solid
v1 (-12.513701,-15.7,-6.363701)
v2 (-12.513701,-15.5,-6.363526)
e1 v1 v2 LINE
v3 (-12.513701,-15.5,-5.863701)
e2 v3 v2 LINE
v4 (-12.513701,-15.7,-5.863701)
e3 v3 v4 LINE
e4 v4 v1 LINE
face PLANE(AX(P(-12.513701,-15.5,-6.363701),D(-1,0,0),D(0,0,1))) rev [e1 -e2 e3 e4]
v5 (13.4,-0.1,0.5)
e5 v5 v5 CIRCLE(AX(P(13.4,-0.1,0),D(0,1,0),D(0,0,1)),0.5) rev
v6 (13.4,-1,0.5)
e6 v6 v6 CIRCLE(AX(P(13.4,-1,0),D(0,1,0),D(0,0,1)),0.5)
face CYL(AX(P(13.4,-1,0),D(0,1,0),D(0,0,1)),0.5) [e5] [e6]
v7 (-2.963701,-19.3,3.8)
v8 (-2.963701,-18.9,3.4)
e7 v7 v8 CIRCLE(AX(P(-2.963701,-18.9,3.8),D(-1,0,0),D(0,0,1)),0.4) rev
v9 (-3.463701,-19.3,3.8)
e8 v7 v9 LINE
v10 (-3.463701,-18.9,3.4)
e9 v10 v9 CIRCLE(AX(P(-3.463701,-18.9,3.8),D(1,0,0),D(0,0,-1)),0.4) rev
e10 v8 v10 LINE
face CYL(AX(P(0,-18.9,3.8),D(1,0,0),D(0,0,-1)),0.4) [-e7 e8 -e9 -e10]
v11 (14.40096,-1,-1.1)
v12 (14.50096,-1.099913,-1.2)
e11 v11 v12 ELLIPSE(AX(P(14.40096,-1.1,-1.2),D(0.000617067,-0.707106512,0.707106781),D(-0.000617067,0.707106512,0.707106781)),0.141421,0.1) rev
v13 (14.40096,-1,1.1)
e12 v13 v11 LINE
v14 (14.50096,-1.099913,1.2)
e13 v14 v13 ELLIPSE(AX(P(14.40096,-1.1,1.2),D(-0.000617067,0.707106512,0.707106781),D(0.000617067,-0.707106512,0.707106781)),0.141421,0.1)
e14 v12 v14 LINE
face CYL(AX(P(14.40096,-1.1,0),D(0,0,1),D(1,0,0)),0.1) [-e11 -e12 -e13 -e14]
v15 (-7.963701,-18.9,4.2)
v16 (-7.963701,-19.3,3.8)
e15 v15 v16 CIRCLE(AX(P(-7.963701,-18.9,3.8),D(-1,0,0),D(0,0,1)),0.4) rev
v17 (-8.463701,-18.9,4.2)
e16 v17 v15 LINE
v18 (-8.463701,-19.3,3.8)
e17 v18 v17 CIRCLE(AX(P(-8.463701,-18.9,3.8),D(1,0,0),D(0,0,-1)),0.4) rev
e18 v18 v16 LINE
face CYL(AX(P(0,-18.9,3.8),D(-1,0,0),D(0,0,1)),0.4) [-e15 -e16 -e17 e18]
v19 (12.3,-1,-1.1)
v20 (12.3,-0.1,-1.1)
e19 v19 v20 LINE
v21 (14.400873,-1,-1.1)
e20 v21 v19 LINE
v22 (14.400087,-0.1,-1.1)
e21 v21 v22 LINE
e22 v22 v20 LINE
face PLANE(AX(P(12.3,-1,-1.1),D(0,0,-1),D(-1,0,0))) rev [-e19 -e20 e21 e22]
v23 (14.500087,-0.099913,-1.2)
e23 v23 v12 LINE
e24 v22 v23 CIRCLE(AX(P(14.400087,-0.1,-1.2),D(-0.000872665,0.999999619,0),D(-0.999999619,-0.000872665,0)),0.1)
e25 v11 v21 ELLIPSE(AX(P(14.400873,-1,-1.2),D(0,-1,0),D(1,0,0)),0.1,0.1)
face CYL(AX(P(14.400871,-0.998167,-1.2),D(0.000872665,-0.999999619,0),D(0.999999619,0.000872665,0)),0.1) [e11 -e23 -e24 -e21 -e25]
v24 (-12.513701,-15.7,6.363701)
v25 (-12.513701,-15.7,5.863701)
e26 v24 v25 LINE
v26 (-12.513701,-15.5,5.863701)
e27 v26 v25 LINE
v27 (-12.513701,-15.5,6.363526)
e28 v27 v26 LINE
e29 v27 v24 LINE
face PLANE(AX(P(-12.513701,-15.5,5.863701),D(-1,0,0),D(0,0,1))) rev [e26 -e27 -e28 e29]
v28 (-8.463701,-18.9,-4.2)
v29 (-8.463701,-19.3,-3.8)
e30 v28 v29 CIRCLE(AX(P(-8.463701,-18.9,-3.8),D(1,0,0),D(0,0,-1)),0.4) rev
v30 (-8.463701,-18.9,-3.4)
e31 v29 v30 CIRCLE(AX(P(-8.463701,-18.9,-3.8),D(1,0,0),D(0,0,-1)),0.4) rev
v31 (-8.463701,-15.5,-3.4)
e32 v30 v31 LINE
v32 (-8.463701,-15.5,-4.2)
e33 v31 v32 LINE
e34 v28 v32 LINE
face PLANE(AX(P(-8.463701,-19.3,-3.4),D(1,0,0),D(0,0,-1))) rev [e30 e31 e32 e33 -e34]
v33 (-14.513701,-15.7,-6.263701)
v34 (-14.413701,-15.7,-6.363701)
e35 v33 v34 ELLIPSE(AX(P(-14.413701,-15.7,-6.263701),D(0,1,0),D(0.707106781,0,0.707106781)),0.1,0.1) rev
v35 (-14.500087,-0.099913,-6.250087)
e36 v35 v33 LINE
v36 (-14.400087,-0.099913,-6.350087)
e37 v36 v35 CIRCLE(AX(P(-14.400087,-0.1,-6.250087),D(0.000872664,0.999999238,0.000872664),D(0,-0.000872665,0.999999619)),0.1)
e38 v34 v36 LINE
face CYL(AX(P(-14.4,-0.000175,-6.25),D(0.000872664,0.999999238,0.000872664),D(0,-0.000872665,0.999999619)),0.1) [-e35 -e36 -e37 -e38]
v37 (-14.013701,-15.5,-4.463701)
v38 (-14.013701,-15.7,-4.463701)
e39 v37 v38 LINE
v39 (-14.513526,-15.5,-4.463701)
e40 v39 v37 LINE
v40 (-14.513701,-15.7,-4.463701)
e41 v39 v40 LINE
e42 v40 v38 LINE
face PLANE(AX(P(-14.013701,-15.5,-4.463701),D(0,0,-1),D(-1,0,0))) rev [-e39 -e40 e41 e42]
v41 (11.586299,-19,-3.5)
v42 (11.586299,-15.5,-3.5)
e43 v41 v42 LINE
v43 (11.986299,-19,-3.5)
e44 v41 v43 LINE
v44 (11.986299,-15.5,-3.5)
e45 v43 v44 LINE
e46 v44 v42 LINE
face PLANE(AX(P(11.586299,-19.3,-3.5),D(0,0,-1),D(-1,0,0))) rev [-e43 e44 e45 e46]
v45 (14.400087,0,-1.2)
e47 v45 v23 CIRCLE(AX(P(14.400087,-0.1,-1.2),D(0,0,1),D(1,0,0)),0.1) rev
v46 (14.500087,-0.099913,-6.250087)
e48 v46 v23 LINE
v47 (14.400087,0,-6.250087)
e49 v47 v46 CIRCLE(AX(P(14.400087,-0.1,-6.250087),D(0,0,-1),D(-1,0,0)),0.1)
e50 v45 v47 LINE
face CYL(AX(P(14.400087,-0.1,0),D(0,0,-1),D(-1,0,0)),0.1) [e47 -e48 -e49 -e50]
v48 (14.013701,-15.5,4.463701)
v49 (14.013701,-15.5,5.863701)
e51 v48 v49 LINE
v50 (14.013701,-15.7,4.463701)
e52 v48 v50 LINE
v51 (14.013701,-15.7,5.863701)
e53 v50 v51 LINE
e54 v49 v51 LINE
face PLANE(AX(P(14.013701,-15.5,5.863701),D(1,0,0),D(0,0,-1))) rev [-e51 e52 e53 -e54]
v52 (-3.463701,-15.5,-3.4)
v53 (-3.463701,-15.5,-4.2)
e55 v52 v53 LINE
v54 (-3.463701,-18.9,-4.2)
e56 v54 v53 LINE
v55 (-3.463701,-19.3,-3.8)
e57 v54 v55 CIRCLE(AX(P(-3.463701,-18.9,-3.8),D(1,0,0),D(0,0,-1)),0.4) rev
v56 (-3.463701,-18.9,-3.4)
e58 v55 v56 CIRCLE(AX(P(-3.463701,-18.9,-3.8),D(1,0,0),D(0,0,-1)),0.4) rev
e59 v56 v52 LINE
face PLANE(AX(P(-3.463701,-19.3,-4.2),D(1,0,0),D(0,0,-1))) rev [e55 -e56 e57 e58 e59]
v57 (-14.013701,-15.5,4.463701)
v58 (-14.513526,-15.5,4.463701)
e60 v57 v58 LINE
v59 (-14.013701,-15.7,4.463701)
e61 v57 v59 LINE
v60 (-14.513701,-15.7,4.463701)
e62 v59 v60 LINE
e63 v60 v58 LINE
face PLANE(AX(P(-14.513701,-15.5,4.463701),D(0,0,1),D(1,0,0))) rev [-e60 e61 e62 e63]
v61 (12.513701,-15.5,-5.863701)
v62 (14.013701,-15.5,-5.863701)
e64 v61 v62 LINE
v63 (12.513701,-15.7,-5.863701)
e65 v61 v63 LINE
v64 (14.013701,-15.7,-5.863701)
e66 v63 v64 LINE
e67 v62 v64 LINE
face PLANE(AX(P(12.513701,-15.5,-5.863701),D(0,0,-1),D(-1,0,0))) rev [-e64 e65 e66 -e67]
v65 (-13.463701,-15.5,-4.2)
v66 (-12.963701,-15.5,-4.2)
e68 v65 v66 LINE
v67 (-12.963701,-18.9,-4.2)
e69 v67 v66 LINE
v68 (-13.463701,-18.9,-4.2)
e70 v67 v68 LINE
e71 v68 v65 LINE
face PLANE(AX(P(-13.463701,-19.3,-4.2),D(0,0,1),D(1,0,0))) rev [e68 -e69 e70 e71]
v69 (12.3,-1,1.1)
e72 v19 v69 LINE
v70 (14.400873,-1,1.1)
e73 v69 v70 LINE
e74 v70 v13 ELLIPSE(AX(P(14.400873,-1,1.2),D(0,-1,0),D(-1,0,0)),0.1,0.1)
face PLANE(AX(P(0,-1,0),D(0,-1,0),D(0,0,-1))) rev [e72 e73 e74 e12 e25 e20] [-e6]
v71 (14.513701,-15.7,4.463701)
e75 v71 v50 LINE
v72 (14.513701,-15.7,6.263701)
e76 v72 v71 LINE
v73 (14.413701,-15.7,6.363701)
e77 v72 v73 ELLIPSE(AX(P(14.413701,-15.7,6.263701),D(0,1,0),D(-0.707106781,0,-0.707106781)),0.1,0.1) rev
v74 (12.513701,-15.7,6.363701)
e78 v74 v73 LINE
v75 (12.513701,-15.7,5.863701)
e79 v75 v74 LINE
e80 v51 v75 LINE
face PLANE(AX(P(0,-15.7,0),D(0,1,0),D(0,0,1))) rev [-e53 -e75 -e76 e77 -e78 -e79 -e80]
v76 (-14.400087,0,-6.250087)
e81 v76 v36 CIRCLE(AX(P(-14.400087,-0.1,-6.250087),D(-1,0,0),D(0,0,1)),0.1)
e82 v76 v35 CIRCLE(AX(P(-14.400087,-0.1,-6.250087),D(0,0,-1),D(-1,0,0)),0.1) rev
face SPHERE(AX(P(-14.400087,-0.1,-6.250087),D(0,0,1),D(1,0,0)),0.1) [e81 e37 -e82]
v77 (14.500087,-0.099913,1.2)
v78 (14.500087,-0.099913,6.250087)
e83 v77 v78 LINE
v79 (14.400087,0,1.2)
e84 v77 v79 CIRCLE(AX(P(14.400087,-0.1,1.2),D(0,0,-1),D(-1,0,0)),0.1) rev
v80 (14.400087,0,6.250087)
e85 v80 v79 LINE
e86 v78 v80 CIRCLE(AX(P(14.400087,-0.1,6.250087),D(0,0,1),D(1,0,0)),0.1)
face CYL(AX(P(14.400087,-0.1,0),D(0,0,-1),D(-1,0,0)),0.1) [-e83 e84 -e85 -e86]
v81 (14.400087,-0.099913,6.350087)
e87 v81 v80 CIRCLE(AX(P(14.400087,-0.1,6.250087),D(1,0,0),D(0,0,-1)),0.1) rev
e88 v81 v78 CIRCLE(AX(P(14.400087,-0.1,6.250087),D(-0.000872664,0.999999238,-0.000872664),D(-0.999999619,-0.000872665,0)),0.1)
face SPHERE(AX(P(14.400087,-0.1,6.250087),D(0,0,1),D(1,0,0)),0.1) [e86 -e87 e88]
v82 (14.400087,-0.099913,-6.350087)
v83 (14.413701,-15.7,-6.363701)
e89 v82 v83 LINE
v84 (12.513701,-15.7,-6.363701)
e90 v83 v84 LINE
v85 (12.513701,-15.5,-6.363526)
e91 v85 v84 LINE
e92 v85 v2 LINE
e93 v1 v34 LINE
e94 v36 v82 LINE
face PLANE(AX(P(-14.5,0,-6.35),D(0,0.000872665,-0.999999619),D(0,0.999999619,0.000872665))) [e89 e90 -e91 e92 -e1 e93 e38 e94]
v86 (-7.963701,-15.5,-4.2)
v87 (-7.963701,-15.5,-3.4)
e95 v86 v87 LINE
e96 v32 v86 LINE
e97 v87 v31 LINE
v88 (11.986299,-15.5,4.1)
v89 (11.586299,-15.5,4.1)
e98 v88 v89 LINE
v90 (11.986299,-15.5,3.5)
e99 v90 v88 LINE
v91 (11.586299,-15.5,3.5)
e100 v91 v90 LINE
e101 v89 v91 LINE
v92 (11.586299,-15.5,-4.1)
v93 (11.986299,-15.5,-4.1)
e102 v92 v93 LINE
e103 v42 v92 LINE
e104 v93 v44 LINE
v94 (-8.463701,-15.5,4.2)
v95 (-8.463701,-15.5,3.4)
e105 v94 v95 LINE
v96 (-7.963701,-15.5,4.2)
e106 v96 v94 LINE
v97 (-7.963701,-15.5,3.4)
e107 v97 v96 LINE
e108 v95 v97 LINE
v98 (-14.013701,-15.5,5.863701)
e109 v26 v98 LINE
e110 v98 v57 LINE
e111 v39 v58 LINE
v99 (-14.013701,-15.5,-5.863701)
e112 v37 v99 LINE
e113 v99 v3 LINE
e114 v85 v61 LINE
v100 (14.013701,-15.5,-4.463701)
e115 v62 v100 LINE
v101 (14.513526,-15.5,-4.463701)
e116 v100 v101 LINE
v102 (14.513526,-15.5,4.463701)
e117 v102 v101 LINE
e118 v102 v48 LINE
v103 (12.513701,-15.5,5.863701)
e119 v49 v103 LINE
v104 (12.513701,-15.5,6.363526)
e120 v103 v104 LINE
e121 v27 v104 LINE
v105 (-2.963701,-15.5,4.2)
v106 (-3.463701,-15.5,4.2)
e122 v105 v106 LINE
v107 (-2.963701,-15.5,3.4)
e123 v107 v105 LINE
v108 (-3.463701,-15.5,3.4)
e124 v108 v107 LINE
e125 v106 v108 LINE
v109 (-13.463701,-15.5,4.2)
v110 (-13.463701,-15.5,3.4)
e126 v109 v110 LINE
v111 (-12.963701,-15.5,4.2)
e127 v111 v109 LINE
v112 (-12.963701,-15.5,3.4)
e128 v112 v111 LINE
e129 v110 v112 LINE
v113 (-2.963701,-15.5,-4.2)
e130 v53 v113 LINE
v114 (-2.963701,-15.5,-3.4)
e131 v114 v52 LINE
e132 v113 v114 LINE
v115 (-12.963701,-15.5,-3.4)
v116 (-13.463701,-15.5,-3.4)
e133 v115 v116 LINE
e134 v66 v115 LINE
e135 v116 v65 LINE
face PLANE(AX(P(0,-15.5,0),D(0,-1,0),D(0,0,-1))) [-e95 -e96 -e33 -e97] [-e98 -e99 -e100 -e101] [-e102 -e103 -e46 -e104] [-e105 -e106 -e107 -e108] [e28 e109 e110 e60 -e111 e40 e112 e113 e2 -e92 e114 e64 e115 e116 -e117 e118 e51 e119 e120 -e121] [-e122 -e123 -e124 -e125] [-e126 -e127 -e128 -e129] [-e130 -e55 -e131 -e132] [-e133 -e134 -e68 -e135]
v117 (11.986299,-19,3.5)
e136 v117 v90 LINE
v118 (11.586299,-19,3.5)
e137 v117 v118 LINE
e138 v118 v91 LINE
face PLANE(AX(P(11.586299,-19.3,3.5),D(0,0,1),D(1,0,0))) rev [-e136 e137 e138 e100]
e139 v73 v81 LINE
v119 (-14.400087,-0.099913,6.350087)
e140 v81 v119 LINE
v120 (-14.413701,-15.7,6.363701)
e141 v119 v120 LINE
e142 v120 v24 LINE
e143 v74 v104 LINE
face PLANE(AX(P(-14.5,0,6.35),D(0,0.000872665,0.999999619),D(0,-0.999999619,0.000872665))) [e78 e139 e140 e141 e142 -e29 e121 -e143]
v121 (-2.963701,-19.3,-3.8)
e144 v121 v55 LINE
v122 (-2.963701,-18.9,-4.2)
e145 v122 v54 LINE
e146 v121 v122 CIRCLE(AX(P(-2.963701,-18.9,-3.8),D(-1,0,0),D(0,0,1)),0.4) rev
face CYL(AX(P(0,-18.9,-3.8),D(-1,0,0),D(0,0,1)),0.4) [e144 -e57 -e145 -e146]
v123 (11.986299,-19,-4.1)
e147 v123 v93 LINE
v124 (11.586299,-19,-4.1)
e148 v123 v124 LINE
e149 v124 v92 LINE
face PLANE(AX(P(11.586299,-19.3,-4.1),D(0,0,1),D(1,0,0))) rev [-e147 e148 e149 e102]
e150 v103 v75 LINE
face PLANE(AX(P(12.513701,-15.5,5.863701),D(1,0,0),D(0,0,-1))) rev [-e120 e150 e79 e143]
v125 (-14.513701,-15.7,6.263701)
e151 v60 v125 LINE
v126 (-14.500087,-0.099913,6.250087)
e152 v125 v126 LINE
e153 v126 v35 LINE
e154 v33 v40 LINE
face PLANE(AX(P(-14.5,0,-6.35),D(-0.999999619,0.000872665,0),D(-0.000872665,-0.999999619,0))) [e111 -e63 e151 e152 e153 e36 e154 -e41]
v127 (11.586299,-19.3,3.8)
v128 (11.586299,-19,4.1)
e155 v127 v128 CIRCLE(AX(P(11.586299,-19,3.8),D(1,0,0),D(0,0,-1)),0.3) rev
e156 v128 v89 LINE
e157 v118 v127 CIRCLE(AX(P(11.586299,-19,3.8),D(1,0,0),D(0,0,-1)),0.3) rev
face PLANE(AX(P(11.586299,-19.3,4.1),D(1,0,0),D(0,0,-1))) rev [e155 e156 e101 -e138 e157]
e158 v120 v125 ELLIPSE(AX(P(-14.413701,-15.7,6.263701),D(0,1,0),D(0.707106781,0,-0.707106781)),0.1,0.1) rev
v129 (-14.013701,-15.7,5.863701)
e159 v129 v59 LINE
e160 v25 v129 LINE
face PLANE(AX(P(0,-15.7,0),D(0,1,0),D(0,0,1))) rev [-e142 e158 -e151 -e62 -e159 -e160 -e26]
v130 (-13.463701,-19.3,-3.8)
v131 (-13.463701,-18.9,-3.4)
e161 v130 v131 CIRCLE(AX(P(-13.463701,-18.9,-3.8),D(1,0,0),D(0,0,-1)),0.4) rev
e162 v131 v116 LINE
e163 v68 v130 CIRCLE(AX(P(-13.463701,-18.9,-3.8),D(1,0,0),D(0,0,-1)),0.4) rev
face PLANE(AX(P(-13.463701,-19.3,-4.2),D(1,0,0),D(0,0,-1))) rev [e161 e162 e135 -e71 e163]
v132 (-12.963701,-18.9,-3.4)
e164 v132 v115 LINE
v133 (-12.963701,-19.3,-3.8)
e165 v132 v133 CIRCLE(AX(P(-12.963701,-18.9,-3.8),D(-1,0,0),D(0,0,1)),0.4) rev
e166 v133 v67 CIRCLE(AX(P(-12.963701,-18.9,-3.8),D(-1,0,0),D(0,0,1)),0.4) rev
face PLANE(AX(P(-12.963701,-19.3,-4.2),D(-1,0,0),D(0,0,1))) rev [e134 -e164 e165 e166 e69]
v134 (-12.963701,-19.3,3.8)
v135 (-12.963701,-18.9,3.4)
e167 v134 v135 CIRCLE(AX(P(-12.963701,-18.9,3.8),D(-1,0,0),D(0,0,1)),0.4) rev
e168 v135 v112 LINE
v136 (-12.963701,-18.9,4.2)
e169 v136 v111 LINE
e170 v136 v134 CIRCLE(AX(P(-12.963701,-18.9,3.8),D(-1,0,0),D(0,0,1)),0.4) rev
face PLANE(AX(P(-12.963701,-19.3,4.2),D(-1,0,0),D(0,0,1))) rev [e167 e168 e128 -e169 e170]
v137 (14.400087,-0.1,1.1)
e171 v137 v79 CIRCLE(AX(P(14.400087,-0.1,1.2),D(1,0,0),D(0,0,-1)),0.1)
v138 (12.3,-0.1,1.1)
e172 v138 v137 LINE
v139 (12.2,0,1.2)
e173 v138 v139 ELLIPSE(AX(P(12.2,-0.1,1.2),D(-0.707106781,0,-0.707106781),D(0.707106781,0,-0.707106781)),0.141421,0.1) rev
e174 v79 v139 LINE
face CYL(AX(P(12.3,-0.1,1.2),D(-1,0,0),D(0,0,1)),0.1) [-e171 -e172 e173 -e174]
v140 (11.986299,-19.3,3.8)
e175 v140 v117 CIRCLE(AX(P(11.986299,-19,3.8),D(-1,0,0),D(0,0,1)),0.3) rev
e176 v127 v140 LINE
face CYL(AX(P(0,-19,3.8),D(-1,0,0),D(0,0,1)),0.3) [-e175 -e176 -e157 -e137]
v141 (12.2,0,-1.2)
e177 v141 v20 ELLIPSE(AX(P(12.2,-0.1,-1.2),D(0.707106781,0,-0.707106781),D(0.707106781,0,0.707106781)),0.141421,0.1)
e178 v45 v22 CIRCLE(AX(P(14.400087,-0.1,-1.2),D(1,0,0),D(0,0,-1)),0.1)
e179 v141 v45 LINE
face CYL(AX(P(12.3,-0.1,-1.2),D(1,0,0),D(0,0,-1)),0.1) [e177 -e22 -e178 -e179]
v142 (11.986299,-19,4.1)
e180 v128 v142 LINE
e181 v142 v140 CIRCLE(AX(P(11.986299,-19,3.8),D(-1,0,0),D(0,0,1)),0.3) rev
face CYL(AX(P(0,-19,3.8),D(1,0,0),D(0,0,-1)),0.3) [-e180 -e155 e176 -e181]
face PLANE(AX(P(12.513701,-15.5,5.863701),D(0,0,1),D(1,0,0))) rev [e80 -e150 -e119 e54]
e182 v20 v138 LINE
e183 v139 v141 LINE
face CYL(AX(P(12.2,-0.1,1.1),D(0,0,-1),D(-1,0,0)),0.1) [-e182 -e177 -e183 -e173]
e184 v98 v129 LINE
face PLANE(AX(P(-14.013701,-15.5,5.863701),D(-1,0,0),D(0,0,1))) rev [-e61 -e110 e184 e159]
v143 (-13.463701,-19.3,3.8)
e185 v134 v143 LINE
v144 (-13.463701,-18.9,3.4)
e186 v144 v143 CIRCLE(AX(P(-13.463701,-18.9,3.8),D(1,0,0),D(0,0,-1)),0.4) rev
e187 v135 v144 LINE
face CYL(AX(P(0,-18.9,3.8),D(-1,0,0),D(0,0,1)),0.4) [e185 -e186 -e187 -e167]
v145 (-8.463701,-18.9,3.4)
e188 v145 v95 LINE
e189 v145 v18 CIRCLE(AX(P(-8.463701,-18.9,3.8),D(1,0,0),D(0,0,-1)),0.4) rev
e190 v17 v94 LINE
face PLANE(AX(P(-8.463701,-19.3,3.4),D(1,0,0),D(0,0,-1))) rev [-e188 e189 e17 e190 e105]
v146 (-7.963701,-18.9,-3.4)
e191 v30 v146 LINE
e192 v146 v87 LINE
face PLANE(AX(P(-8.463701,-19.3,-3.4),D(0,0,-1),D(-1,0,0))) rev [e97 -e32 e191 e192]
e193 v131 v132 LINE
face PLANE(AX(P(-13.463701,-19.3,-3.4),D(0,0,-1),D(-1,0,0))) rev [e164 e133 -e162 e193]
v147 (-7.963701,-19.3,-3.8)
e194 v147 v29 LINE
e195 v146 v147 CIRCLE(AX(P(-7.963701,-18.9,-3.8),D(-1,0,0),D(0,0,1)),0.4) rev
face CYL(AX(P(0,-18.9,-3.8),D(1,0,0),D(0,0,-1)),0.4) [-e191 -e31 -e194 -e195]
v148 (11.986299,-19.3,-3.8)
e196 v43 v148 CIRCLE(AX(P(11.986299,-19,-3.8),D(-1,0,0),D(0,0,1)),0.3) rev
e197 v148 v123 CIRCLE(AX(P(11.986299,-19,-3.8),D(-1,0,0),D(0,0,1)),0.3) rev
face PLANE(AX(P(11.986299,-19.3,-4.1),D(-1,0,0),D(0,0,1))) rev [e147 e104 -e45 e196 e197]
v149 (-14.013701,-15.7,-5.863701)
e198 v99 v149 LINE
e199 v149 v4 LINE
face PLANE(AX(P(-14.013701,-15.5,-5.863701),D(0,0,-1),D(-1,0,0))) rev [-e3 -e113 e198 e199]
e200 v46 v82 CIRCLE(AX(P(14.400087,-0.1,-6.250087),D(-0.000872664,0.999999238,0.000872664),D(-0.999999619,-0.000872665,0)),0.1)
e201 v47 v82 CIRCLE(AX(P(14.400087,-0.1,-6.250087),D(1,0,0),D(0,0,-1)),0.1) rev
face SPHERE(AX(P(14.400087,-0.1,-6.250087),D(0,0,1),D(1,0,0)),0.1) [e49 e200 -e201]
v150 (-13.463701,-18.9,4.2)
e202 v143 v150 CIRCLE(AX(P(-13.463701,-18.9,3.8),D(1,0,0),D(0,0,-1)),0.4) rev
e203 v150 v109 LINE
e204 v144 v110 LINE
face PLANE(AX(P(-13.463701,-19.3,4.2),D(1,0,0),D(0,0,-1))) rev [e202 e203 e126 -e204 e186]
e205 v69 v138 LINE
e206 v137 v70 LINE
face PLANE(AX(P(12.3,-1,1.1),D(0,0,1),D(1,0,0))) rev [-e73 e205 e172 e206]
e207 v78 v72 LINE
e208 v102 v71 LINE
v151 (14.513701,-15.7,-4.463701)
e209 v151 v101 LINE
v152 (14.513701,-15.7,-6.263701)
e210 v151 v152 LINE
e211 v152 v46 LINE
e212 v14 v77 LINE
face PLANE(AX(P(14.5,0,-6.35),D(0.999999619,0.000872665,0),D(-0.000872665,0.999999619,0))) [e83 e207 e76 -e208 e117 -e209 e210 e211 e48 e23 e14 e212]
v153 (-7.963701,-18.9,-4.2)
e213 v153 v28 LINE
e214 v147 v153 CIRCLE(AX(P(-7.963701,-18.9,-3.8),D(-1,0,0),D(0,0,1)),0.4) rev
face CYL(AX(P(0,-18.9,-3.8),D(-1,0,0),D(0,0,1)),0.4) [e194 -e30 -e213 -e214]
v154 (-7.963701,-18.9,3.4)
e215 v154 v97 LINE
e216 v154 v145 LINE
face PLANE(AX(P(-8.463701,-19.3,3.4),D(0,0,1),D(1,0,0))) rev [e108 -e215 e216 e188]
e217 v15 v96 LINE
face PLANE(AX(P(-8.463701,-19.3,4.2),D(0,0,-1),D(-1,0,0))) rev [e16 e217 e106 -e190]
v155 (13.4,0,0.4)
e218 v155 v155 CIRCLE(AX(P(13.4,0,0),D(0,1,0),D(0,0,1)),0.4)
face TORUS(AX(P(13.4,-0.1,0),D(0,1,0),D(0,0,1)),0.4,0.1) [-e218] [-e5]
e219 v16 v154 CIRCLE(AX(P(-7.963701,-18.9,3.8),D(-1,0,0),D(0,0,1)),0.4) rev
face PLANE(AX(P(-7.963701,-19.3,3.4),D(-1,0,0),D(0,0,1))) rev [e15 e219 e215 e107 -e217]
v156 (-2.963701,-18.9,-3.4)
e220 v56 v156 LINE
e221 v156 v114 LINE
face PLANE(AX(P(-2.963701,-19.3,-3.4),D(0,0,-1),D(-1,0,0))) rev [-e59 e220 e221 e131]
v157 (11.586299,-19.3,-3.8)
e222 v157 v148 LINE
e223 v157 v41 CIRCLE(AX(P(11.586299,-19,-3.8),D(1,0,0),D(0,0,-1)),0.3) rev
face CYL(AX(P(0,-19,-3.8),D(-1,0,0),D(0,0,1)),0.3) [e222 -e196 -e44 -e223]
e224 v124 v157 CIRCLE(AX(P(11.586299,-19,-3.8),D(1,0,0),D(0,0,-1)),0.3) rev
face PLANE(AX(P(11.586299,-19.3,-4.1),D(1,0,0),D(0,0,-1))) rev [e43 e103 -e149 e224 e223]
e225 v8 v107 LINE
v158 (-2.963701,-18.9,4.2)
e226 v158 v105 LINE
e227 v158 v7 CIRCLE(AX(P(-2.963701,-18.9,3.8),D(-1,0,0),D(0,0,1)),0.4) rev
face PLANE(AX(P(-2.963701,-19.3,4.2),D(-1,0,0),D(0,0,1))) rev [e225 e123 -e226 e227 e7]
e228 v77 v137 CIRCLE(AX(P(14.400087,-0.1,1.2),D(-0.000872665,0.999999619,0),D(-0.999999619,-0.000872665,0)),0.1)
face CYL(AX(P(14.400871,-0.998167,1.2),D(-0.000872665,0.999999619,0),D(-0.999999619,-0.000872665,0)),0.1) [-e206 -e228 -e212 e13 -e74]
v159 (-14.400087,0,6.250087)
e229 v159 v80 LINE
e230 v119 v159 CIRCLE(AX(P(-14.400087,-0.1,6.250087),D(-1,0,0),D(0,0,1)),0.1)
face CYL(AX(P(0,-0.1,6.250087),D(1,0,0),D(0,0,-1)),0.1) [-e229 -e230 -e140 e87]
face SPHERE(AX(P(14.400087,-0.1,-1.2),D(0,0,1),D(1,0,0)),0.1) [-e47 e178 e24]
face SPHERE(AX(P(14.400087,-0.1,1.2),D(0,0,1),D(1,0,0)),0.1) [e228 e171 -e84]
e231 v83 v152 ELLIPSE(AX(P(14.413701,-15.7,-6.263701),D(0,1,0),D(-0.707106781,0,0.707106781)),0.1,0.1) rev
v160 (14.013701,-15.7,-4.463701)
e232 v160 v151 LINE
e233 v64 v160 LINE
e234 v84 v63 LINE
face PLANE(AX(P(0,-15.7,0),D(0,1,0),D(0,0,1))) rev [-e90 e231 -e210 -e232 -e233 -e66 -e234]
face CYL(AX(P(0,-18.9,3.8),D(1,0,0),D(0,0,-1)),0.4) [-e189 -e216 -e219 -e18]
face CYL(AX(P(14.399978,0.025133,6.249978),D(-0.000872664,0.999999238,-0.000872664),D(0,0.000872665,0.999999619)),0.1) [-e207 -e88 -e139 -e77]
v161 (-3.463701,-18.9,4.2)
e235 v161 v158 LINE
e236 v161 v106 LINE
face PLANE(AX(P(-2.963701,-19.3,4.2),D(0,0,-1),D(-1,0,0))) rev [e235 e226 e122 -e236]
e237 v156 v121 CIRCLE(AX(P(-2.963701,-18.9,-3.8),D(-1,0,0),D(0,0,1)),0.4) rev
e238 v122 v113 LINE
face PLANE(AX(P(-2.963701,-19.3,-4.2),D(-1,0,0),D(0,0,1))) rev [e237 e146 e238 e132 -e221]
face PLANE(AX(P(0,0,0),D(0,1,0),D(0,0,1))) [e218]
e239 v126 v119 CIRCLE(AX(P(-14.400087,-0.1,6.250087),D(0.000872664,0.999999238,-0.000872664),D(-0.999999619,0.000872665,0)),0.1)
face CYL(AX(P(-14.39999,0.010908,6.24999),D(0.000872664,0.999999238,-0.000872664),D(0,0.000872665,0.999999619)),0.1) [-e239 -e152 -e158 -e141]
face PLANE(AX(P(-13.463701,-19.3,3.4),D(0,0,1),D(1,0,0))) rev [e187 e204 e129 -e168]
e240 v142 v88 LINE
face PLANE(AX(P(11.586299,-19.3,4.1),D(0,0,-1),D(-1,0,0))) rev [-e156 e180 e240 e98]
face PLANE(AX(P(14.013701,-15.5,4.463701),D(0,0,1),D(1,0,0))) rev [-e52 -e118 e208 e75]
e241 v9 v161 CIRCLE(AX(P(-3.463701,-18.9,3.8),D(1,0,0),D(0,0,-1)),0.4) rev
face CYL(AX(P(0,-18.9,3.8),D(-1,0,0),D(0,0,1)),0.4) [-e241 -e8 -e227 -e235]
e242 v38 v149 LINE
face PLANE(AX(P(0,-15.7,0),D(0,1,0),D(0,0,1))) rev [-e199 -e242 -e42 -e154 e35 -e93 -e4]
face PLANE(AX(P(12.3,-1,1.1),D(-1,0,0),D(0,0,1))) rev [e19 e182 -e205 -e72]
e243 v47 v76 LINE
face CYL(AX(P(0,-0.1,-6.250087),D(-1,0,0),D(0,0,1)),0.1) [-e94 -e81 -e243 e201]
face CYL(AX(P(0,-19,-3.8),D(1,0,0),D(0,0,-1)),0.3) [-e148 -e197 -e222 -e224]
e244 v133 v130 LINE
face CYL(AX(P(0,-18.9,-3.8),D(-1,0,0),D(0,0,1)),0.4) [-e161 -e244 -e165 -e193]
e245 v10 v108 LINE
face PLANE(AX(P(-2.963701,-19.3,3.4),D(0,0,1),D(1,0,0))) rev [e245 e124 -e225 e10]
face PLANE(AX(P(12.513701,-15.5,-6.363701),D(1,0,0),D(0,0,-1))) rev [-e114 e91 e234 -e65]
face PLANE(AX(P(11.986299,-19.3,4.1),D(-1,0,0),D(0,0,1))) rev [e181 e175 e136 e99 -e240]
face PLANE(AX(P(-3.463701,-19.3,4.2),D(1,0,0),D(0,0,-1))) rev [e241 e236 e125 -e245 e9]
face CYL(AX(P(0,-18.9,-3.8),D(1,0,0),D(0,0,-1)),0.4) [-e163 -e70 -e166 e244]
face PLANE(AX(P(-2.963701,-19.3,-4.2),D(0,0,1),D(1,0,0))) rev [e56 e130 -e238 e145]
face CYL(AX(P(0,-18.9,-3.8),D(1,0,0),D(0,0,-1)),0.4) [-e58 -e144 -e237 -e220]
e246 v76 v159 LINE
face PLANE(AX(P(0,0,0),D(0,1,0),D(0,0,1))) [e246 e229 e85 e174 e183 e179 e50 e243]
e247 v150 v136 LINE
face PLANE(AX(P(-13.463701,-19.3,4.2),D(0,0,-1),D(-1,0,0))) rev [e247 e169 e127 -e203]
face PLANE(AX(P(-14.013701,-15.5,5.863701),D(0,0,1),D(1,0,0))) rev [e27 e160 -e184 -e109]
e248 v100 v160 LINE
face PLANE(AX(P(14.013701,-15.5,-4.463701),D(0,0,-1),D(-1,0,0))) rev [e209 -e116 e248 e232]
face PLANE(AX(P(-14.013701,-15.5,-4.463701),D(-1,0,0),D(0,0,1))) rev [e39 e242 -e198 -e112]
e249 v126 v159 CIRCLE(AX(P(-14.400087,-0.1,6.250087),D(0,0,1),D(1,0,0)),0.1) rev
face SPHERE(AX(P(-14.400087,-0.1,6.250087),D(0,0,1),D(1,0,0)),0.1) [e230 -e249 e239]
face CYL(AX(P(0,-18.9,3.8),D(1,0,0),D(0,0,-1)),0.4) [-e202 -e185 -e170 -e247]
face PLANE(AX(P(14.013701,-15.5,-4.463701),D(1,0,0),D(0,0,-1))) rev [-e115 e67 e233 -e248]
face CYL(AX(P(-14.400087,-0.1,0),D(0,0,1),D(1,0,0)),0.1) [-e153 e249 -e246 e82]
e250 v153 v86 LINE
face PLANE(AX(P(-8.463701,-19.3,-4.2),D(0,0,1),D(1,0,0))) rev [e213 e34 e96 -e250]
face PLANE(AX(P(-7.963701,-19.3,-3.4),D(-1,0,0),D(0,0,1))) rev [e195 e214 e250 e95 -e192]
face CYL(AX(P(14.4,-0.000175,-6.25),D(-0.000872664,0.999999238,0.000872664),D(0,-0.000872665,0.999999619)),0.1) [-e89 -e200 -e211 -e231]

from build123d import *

# Parameters (mm, degrees)
SKETCH1_W           = 29
SKETCH1_H           = 12.7
BOSS_EXTRUDE1_DEPTH = 15.7
BOSS_EXTRUDE1_DRAFT = 0.05
CUT_EXTRUDE1_DEPTH  = 0.2
SKETCH3_W           = 0.4
SKETCH3_H           = 0.6
SKETCH3_W_2         = 0.5
SKETCH3_H_2         = 0.8
BOSS_EXTRUDE2_DEPTH = 3.8
FILLET1_R           = 0.3
FILLET2_R           = 0.4
SKETCH4_W           = 3.182056495
SKETCH4_H           = 2.2
SKETCH4_R           = 0.5
CUT_EXTRUDE2_DEPTH  = 1
FILLET3_R           = 0.1


with BuildPart() as part:
    # Sketch1 → Boss-Extrude1 (with draft: the straight prism first)
    with BuildSketch(Plane(origin=(0, 0, 0), x_dir=(1, 0, 0), z_dir=(0, 1, 0))):
        Rectangle(SKETCH1_W, SKETCH1_H)
    extrude(amount=-BOSS_EXTRUDE1_DEPTH)
    # Boss-Extrude1: the draft: its side faces are tilted about the plane it starts from
    boss_extrude1_sides = [part.faces().sort_by_distance(p)[0] for p in [
        (-14.5, -7.85, 0),
        (0, -7.85, 6.35),
        (14.5, -7.85, 0),
        (0, -7.85, -6.35),
    ]]
    draft(boss_extrude1_sides, Plane(origin=(0, 0, 0), x_dir=(1, 0, 0), z_dir=(0, 1, 0)), BOSS_EXTRUDE1_DRAFT)

    # Sketch2 → Cut-Extrude1 (cut)
    with BuildSketch(Plane(origin=(0, -15.7, 0), x_dir=(-1, 0, 0), z_dir=(0, -1, 0))):
        Polygon((14.013700838, -5.863700838), (12.513700838, -5.863700838), (12.513700838, -6.363700838), (-12.513700838, -6.363700838), (-12.513700838, -5.863700838), (-14.013700838, -5.863700838), (-14.013700838, -4.463700838), (-14.513700838, -4.463700838), (-14.513700838, 4.463700838), (-14.013700838, 4.463700838), (-14.013700838, 5.863700838), (-12.513700838, 5.863700838), (-12.513700838, 6.363700838), (12.513700838, 6.363700838), (12.513700838, 5.863700838), (14.013700838, 5.863700838), (14.013700838, 4.463700838), (14.513700838, 4.463700838), (14.513700838, -4.463700838), (14.013700838, -4.463700838), align=None)
    extrude(amount=-CUT_EXTRUDE1_DEPTH, mode=Mode.SUBTRACT)

    # Sketch3 → Boss-Extrude2 (add)
    with BuildSketch(Plane.XZ.offset(15.5)):
        with Locations((11.786299162, -3.8)):
            Rectangle(SKETCH3_W, SKETCH3_H)
        with Locations((11.786299162, 3.8)):
            Rectangle(SKETCH3_W, SKETCH3_H)
        with Locations((-8.213700838, 3.8)):
            Rectangle(SKETCH3_W_2, SKETCH3_H_2)
        with Locations((-13.213700838, -3.8)):
            Rectangle(SKETCH3_W_2, SKETCH3_H_2)
        with Locations((-13.213700838, 3.8)):
            Rectangle(SKETCH3_W_2, SKETCH3_H_2)
        with Locations((-8.213700838, -3.8)):
            Rectangle(SKETCH3_W_2, SKETCH3_H_2)
        with Locations((-3.213700838, 3.8)):
            Rectangle(SKETCH3_W_2, SKETCH3_H_2)
        with Locations((-3.213700838, -3.8)):
            Rectangle(SKETCH3_W_2, SKETCH3_H_2)
    extrude(amount=BOSS_EXTRUDE2_DEPTH)

    # Fillet1
    fillet1_edges = [part.edges().sort_by_distance(p)[0] for p in [
        (11.786299162, -19.3, 4.1),
        (11.786299162, -19.3, 3.5),
        (11.786299162, -19.3, -3.5),
        (11.786299162, -19.3, -4.1),
    ]]
    fillet(fillet1_edges, radius=FILLET1_R - 0.0001)  # a hair under: the kernel refuses the full size

    # Fillet2
    fillet2_edges = [part.edges().sort_by_distance(p)[0] for p in [
        (-13.213700838, -19.3, -4.2),
        (-13.213700838, -19.3, -3.4),
        (-8.213700838, -19.3, 4.2),
        (-8.213700838, -19.3, 3.4),
        (-13.213700838, -19.3, 3.4),
        (-13.213700838, -19.3, 4.2),
        (-8.213700838, -19.3, -4.2),
        (-8.213700838, -19.3, -3.4),
        (-3.213700838, -19.3, -4.2),
        (-3.213700838, -19.3, -3.4),
        (-3.213700838, -19.3, 3.4),
        (-3.213700838, -19.3, 4.2),
    ]]
    fillet(fillet2_edges, radius=FILLET2_R - 0.0001)  # a hair under: the kernel refuses the full size

    # Sketch4 → Cut-Extrude2 (cut)
    with BuildSketch(Plane(origin=(0, 0, 0), x_dir=(1, 0, 0), z_dir=(0, 1, 0))):
        with Locations((13.891028247, 0)):
            Rectangle(SKETCH4_W, SKETCH4_H)
        with Locations(Location((13.4, 0, 0), (0, 0, 270))):
            Circle(SKETCH4_R, mode=Mode.SUBTRACT)
    extrude(amount=-CUT_EXTRUDE2_DEPTH, mode=Mode.SUBTRACT)

    # Fillet3
    fillet3_edges = [part.edges().sort_by_distance(p)[0] for p in [
        (14.5, 0, -3.725),
        (13.4, 0, -1.1),
        (14.500872665, -1, 0),
        (14.500436332, -0.5, -1.1),
        (14.500436332, -0.5, 1.1),
        (13.4, 0, 1.1),
        (12.3, 0, 0),
        (13.4, 0, -0.5),
        (0, 0, 6.35),
        (-14.5, 0, 0),
        (0, 0, -6.35),
        (14.5, 0, 3.725),
        (14.506850419, -7.85, 6.356850419),
        (-14.506850419, -7.85, 6.356850419),
        (-14.506850419, -7.85, -6.356850419),
        (14.506850419, -7.85, -6.356850419),
    ]]
    fillet(fillet3_edges, radius=FILLET3_R)


solid = part.part
